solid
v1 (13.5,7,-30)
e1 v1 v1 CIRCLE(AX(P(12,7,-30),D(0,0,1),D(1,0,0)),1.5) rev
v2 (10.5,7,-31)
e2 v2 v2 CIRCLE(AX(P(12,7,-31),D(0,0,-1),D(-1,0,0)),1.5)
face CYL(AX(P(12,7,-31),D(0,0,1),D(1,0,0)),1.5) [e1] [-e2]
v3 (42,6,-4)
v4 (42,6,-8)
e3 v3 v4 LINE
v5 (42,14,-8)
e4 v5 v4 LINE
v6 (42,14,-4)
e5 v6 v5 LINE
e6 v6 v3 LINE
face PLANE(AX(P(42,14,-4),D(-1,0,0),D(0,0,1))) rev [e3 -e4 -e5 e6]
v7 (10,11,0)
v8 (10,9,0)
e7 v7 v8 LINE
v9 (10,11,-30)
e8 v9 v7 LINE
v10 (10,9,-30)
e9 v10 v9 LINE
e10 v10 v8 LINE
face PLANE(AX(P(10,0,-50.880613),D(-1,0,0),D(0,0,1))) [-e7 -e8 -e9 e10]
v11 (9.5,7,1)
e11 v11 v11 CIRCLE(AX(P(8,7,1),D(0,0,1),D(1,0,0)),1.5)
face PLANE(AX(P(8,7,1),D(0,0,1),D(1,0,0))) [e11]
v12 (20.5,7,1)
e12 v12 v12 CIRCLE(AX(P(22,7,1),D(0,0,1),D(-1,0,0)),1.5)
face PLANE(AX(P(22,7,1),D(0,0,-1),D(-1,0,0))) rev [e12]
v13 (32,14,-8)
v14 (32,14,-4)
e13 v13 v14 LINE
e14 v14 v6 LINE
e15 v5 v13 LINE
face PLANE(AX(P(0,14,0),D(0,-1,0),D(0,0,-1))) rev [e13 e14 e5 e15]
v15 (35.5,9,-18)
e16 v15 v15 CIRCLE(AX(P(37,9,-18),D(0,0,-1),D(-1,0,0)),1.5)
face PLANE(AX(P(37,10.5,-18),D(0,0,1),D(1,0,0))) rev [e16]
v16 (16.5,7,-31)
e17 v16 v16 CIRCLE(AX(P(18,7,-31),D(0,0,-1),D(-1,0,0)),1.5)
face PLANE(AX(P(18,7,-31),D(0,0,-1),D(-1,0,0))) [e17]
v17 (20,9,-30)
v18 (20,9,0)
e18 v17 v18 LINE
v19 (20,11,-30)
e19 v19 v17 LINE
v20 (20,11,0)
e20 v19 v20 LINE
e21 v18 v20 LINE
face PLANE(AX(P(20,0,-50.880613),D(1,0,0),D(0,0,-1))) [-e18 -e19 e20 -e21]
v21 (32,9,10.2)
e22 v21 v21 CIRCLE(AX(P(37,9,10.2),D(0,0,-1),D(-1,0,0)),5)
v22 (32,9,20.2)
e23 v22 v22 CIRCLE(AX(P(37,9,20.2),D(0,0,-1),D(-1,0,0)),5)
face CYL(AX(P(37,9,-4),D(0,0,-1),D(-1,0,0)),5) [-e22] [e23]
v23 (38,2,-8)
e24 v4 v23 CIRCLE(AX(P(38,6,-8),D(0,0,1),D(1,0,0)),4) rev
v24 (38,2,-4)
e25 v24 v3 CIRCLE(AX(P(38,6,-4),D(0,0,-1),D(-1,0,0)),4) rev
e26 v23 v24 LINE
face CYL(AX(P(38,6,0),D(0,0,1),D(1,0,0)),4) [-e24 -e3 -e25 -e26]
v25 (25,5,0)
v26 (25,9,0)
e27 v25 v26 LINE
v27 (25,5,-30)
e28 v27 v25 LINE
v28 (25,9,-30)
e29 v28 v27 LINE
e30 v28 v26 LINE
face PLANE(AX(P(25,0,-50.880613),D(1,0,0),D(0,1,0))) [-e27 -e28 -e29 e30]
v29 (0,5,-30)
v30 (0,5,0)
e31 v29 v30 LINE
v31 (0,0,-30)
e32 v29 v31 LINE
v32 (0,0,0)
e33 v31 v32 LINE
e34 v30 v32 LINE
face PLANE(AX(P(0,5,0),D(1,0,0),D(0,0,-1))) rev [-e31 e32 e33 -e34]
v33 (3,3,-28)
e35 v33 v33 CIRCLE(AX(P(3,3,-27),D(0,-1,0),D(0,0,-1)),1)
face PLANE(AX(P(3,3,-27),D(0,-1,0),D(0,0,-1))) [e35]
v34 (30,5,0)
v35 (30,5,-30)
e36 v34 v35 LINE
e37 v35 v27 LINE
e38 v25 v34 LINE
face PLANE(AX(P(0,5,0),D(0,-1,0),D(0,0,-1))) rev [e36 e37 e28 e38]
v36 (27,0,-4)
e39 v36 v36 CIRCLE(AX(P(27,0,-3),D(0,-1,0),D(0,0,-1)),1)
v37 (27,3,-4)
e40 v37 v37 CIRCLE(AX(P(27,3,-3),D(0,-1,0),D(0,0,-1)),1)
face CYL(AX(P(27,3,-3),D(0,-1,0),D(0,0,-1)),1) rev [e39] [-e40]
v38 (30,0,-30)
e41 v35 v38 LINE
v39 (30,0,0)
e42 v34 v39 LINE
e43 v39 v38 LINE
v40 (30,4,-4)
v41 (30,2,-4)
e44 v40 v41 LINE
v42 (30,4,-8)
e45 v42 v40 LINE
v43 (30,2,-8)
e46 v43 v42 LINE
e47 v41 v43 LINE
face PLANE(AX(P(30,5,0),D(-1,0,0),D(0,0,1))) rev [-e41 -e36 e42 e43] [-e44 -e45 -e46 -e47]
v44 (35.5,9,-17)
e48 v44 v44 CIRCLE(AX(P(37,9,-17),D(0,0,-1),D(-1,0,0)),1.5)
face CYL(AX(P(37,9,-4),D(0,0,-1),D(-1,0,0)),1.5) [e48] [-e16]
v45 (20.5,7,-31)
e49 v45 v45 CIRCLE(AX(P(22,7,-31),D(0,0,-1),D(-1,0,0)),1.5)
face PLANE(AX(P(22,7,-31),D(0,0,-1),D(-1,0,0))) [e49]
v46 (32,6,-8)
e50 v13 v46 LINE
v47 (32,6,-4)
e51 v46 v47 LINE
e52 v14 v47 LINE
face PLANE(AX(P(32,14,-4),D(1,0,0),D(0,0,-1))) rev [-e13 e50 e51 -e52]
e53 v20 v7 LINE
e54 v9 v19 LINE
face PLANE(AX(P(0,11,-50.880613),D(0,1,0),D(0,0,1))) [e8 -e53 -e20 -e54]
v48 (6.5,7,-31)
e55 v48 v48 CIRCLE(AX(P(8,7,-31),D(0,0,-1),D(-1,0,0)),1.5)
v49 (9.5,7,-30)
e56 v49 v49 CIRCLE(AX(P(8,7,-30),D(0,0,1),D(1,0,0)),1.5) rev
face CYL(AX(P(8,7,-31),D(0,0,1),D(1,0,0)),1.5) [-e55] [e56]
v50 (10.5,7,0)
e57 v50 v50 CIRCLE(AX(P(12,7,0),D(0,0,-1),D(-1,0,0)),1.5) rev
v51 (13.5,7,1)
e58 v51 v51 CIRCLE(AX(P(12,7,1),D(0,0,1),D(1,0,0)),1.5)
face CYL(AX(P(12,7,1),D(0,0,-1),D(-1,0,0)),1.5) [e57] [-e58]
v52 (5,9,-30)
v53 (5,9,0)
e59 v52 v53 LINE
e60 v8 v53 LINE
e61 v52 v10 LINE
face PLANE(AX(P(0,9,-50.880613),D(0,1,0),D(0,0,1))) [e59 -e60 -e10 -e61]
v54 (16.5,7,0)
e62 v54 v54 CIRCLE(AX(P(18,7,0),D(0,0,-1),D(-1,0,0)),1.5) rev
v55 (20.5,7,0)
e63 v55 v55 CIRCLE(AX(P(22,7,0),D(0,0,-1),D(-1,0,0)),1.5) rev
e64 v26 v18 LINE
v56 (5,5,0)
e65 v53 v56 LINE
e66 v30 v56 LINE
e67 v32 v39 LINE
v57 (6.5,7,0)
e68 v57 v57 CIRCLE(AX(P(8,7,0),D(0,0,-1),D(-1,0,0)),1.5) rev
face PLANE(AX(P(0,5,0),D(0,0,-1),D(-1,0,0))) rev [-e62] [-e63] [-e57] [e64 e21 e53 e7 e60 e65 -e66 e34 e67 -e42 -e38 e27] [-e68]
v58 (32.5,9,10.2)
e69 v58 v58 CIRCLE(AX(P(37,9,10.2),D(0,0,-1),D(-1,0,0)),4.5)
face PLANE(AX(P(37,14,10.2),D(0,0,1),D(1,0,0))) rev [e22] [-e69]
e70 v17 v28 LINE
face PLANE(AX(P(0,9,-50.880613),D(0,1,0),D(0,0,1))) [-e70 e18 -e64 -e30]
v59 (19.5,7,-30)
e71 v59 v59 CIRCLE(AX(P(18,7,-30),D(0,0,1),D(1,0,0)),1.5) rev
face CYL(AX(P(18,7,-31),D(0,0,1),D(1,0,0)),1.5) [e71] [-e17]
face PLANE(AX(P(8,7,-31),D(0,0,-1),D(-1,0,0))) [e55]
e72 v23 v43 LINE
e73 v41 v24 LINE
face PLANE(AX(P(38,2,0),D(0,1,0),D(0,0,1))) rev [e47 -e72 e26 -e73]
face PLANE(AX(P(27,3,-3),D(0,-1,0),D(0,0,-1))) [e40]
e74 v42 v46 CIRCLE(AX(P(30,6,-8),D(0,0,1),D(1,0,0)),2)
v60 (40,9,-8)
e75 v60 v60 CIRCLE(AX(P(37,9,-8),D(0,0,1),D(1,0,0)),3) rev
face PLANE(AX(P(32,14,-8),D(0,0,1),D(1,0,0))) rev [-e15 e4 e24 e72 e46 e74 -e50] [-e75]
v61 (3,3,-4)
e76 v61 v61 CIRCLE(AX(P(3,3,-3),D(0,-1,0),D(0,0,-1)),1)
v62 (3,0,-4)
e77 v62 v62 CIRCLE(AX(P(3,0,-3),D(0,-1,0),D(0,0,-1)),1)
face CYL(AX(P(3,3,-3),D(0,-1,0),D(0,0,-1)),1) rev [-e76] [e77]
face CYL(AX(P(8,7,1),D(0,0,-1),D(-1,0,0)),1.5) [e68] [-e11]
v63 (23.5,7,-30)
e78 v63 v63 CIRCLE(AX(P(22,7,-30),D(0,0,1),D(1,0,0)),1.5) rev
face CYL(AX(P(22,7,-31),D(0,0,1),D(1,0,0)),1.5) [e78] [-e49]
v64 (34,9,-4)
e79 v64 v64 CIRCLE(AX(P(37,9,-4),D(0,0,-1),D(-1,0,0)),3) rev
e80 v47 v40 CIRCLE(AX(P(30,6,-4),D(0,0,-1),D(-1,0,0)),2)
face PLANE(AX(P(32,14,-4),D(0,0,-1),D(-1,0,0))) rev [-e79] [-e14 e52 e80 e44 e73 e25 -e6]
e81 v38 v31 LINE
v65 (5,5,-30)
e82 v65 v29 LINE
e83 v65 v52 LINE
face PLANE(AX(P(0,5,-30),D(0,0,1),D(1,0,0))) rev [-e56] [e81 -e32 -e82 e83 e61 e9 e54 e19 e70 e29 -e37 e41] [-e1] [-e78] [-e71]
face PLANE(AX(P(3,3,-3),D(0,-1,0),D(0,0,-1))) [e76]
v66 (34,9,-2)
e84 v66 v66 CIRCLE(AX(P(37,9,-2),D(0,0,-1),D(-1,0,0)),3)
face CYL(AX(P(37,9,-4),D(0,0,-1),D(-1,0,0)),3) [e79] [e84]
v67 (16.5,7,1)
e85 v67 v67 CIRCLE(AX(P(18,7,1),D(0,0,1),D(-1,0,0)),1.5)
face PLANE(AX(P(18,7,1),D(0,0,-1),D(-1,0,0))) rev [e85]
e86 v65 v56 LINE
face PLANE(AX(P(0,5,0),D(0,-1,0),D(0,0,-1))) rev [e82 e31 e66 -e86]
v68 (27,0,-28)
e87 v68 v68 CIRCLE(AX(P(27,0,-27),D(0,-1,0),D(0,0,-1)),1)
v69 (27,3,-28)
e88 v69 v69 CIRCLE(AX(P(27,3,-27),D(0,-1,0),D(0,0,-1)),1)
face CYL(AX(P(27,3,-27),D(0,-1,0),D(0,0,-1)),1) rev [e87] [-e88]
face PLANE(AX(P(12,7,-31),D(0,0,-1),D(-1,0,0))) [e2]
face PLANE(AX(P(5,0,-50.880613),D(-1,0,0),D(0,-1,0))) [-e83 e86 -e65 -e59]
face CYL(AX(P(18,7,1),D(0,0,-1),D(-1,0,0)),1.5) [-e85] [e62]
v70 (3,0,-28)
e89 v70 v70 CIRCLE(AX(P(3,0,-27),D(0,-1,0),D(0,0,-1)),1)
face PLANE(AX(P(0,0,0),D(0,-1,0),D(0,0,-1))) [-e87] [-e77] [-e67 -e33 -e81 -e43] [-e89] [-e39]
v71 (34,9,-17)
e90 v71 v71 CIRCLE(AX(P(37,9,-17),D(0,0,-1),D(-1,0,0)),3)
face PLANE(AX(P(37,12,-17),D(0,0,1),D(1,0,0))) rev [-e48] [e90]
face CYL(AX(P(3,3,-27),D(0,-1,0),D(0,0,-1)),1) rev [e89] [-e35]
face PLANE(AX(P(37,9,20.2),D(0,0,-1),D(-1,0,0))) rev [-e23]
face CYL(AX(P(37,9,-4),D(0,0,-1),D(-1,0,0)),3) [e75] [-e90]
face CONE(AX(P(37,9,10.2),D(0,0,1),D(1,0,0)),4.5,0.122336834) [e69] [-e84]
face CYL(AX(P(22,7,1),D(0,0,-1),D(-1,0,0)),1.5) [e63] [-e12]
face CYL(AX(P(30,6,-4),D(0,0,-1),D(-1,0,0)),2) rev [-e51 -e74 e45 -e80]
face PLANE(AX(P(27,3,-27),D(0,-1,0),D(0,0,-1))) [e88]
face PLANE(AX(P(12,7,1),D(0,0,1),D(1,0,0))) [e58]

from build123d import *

# Parameters (mm, degrees)
SKETCH_2_W          = 30
SKETCH_2_H          = 30
EXTRUDE_1_DEPTH     = 5
SKETCH_3_R          = 1
CUT_EXTRUDE_1_DEPTH = 3
EXTRUDE_2_DEPTH     = 30
SKETCH_6_W          = 15
SKETCH_6_H          = 2
EXTRUDE_3_DEPTH     = 8
SKETCH_7_W          = 10
SKETCH_7_H          = 4
EXTRUDE_4_DEPTH     = 10
SKETCH_10_W         = 8
SKETCH_10_H         = 2
CUT_EXTRUDE_2_DEPTH = 7
SKETCH_11_W         = 8
SKETCH_11_H         = 2
CUT_EXTRUDE_3_DEPTH = 4
SKETCH_12_W         = 4
SKETCH_12_H         = 2
EXTRUDE_5_DEPTH     = 4
FILLET_1_R          = 4
FILLET_2_R          = 2
SKETCH_13_R         = 1.5
EXTRUDE_6_DEPTH     = 1
EXTRUDE_START       = 1
SKETCH_14_R         = 1.5
EXTRUDE_7_DEPTH     = 1


with BuildPart() as part:
    # Эскиз2 → Бобышка-Вытянуть1 (new body)
    with BuildSketch(Plane(origin=(0, 0, 0), x_dir=(1, 0, 0), z_dir=(0, 1, 0))):
        with Locations((15, 15)):
            Rectangle(SKETCH_2_W, SKETCH_2_H)
    extrude(amount=EXTRUDE_1_DEPTH)

    # Эскиз3 → Вырез-Вытянуть1 (cut)
    with BuildSketch(Plane.XZ):
        with Locations(Location((27, -3, 0), (0, 0, 270))):
            Circle(SKETCH_3_R)
        with Locations(Location((27, -27, 0), (0, 0, 270))):
            Circle(SKETCH_3_R)
        with Locations(Location((3, -27, 0), (0, 0, 270))):
            Circle(SKETCH_3_R)
        with Locations(Location((3, -3, 0), (0, 0, 270))):
            Circle(SKETCH_3_R)
    extrude(amount=-CUT_EXTRUDE_1_DEPTH, mode=Mode.SUBTRACT)

    # Эскиз5 → Бобышка-Вытянуть2 (add)
    with BuildSketch(Plane.XY):
        Polygon((10, 9), (5, 9), (5, 5), (25, 5), (25, 9), (20, 9), (20, 11), (10, 11), align=None)
    extrude(amount=-EXTRUDE_2_DEPTH)

    # Эскиз6 → Бобышка-Вытянуть3 (add)
    with BuildSketch(Plane(origin=(30, 0, 0), x_dir=(0, 0, -1), z_dir=(1, 0, 0))):
        with Locations((7.5, 3)):
            Rectangle(SKETCH_6_W, SKETCH_6_H)
    extrude(amount=EXTRUDE_3_DEPTH)

    # Эскиз7 → Бобышка-Вытянуть4 (add)
    with BuildSketch(Plane(origin=(0, 4, 0), x_dir=(1, 0, 0), z_dir=(0, 1, 0))):
        with Locations((37, 6)):
            Rectangle(SKETCH_7_W, SKETCH_7_H)
    extrude(amount=EXTRUDE_4_DEPTH)

    # Эскиз9 → Повернуть1 (revolve)
    with BuildSketch(Plane.ZY.offset(-37), mode=Mode.PRIVATE) as revolve_1_sk:
        Polygon((20.2, 9), (20.2, 14), (10.2, 14), (10.2, 13.5), (-2, 12), (-17, 12), (-17, 10.5), (-18, 10.5), (-18, 9), align=None)
    revolve(revolve_1_sk.sketch.rotate(Axis((37, 9, -4), (0, 0, 1)), 90), axis=Axis((37, 9, -4), (0, 0, 1)))

    # Эскиз10 → Вырез-Вытянуть2 (cut)
    with BuildSketch(Plane(origin=(0, 0, -15), x_dir=(-1, 0, 0), z_dir=(0, 0, -1))):
        with Locations((-34, 3)):
            Rectangle(SKETCH_10_W, SKETCH_10_H)
    extrude(amount=-CUT_EXTRUDE_2_DEPTH, mode=Mode.SUBTRACT)

    # Эскиз11 → Вырез-Вытянуть3 (cut)
    with BuildSketch(Plane.XY):
        with Locations((34, 3)):
            Rectangle(SKETCH_11_W, SKETCH_11_H)
    extrude(amount=-CUT_EXTRUDE_3_DEPTH, mode=Mode.SUBTRACT)

    # Эскиз12 → Бобышка-Вытянуть5 (add)
    with BuildSketch(Plane(origin=(38, 0, 0), x_dir=(0, 0, -1), z_dir=(1, 0, 0))):
        with Locations((6, 3)):
            Rectangle(SKETCH_12_W, SKETCH_12_H)
    extrude(amount=EXTRUDE_5_DEPTH)

    # Скругление1
    fillet_1_edges = [part.edges().sort_by_distance(p)[0] for p in [
        (42, 2, -6),
    ]]
    fillet(fillet_1_edges, radius=FILLET_1_R)

    # Скругление2
    fillet_2_edges = [part.edges().sort_by_distance(p)[0] for p in [
        (32, 4, -6),
    ]]
    fillet(fillet_2_edges, radius=FILLET_2_R - 0.0001)  # a hair under: the kernel refuses the full size

    # Эскиз13 → Бобышка-Вытянуть6 (add)
    with BuildSketch(Plane.XY):
        with Locations(Location((8, 7, 0), (0, 0, 180))):
            Circle(SKETCH_13_R)
        with Locations(Location((12, 7, 0), (0, 0, 180))):
            Circle(SKETCH_13_R)
        with Locations(Location((22, 7, 0), (0, 0, 180))):
            Circle(SKETCH_13_R)
        with Locations(Location((18, 7, 0), (0, 0, 180))):
            Circle(SKETCH_13_R)
    extrude(amount=EXTRUDE_6_DEPTH)

    # Эскиз14 → Бобышка-Вытянуть7 (add)
    with BuildSketch(Plane(origin=(0, 0, -30), x_dir=(-1, 0, 0), z_dir=(0, 0, -1)).offset(EXTRUDE_START)):
        with Locations((-8, 7)):
            Circle(SKETCH_14_R)
        with Locations((-12, 7)):
            Circle(SKETCH_14_R)
        with Locations((-18, 7)):
            Circle(SKETCH_14_R)
        with Locations((-22, 7)):
            Circle(SKETCH_14_R)
    extrude(amount=-EXTRUDE_7_DEPTH)


solid = part.part
